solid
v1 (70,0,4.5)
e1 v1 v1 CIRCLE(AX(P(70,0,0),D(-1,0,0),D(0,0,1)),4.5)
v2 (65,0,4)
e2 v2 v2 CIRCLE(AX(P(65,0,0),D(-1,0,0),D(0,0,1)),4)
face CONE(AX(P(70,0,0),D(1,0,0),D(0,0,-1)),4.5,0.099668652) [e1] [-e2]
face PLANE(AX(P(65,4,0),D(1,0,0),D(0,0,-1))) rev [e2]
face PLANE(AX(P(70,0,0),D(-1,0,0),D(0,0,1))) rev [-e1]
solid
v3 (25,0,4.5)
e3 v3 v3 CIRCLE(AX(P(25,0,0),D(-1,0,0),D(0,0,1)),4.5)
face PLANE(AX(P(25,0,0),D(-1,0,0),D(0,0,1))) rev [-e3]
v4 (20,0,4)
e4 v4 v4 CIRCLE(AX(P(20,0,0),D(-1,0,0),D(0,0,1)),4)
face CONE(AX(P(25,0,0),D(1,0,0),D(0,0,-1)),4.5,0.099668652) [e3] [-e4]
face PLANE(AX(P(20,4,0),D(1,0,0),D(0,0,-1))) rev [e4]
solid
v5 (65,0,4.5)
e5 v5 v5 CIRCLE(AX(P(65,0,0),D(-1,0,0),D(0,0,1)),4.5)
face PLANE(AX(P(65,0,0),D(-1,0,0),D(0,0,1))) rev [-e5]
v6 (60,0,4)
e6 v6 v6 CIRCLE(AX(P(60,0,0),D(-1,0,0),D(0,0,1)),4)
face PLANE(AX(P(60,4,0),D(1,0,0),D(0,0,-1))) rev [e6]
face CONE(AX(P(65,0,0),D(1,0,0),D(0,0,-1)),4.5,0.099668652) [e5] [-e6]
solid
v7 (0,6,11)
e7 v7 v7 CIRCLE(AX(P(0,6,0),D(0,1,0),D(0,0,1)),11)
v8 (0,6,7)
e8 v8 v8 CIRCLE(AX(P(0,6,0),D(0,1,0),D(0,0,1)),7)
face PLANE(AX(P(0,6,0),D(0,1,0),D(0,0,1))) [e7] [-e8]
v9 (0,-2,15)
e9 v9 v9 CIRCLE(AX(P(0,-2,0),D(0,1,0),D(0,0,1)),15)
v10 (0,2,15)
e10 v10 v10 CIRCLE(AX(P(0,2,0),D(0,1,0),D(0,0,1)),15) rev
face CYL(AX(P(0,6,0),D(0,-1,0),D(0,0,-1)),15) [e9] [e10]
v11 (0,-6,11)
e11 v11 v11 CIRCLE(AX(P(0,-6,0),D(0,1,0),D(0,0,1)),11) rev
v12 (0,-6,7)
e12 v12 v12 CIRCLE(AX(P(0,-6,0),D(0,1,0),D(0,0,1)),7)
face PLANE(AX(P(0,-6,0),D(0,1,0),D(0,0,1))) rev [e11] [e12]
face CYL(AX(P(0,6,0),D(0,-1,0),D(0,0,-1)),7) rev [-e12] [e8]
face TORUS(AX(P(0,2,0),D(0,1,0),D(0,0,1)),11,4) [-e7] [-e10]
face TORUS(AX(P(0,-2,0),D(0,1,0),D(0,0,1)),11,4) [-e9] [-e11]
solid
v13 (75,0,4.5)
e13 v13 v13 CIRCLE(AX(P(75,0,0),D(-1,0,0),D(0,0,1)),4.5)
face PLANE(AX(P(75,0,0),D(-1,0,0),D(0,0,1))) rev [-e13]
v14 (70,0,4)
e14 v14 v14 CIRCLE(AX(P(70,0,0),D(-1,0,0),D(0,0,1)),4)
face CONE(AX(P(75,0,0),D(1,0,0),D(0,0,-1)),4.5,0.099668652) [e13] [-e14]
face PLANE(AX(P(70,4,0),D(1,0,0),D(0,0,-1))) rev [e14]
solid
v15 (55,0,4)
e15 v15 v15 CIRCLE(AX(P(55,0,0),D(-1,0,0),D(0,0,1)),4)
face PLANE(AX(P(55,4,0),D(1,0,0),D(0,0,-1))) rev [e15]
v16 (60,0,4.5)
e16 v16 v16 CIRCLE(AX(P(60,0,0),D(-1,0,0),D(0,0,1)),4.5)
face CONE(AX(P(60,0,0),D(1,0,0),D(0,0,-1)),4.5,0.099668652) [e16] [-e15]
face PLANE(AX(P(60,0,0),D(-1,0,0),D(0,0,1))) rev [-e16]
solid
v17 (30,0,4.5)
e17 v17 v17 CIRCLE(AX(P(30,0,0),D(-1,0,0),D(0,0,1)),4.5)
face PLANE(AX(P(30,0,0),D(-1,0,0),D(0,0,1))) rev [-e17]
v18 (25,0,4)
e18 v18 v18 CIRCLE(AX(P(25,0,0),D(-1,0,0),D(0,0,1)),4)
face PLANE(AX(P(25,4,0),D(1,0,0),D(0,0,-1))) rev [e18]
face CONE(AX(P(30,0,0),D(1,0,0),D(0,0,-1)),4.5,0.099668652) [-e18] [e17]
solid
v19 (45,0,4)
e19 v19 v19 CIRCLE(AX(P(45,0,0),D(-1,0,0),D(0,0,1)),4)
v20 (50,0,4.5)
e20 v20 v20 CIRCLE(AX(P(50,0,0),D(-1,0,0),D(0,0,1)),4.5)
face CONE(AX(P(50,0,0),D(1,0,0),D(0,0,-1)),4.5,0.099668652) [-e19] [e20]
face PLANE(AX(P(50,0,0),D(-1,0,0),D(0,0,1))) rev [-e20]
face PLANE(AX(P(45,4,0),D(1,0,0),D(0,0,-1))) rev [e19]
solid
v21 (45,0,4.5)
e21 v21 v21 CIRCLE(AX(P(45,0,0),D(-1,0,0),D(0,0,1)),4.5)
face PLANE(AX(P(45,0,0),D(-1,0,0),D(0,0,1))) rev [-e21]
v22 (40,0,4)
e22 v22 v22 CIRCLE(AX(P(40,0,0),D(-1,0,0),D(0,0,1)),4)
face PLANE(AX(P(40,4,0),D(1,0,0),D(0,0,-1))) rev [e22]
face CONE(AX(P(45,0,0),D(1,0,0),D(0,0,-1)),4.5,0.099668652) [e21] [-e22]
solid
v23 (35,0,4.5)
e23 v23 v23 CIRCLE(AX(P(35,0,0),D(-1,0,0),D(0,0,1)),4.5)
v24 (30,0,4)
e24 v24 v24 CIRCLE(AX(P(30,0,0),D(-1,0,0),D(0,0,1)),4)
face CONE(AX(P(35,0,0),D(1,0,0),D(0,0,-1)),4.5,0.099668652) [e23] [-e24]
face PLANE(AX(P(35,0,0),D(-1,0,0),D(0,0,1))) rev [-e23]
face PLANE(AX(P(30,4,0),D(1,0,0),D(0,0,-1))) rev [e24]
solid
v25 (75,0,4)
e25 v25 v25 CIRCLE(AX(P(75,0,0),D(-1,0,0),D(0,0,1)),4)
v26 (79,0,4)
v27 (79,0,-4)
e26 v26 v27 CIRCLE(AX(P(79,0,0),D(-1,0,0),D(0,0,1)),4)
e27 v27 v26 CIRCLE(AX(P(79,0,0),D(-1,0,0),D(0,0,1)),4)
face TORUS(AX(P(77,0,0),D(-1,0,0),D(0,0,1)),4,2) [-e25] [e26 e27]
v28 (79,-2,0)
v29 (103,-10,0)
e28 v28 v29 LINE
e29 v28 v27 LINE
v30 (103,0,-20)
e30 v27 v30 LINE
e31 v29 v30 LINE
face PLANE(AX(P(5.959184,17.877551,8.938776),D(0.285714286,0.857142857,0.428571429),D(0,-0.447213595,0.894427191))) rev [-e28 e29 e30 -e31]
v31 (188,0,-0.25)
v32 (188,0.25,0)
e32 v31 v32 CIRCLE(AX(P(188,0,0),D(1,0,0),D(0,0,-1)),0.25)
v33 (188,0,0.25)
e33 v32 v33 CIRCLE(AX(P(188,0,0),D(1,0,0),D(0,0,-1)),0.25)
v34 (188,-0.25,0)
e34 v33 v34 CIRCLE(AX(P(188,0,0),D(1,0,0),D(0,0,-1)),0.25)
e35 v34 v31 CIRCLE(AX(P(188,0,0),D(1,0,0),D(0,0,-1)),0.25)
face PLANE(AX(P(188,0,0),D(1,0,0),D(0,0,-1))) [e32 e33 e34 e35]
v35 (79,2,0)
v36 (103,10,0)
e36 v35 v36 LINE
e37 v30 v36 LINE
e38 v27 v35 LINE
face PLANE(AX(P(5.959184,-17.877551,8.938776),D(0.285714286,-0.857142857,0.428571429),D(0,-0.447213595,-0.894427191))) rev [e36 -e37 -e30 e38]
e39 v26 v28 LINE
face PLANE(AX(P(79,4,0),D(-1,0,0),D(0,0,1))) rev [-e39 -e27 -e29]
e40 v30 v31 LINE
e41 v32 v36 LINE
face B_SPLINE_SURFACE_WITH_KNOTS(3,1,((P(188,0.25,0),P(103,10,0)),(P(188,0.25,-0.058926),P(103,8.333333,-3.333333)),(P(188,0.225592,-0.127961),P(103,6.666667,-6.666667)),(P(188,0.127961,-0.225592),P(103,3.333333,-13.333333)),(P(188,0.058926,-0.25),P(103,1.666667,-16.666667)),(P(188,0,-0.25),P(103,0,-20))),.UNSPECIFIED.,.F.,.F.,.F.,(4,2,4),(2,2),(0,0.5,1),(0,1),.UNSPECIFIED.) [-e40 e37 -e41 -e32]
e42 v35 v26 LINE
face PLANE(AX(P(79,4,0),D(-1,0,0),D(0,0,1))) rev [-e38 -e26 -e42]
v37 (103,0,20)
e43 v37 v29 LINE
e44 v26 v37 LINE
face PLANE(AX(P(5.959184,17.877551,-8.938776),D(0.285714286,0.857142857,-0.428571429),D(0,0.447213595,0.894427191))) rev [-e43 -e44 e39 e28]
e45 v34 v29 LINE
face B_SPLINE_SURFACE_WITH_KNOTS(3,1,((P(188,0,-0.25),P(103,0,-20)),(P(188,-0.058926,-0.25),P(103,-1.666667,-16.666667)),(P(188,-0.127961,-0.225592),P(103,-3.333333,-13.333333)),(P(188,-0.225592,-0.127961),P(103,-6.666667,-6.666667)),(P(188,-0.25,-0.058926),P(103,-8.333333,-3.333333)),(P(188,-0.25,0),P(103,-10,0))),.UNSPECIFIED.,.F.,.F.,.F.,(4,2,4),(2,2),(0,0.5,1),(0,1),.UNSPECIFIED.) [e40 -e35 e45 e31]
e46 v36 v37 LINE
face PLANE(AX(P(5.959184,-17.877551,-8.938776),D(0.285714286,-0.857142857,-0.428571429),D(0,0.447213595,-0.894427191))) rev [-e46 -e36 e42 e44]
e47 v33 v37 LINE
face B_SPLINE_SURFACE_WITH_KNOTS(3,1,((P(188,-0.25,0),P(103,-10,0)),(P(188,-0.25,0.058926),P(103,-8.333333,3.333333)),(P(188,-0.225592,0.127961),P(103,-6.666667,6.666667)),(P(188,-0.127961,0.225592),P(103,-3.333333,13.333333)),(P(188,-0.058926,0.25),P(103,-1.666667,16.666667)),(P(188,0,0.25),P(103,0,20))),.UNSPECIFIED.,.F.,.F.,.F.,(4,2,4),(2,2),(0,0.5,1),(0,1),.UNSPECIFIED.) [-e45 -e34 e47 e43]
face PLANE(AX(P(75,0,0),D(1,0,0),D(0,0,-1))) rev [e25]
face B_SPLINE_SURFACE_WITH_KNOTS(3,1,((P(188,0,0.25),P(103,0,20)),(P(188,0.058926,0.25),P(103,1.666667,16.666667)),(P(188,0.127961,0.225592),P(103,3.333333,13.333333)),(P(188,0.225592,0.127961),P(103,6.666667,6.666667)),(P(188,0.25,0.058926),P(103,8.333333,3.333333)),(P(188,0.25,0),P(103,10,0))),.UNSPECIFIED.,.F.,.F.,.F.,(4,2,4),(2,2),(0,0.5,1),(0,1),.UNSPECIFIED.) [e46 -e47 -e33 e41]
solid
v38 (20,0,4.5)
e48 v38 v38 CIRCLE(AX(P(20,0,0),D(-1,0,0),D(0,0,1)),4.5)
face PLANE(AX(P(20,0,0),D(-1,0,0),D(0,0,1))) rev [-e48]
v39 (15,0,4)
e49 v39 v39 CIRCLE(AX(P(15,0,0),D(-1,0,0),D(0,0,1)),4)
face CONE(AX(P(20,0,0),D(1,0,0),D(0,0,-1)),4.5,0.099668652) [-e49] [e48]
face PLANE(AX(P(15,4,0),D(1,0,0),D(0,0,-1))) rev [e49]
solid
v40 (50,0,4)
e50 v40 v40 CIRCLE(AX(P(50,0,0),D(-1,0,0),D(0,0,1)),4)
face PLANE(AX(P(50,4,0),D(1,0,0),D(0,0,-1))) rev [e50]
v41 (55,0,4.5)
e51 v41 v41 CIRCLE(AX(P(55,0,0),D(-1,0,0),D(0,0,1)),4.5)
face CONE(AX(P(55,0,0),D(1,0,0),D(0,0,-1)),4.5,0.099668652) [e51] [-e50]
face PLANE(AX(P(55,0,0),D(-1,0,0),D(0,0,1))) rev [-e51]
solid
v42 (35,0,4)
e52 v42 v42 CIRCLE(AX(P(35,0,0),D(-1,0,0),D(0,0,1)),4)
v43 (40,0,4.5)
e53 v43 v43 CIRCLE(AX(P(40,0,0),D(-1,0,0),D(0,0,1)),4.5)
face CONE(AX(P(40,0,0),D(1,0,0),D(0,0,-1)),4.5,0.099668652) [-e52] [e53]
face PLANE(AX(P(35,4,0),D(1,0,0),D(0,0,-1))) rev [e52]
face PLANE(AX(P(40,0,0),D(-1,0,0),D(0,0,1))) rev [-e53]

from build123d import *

# Parameters (mm, degrees)
SKETCH1_R           = 15
SKETCH1_R_2         = 7
BOSS_EXTRUDE1_DEPTH = 6
FILLET1_R           = 4


with BuildPart() as part:
    # Sketch1 → Boss-Extrude1 (new, symmetric)
    with BuildSketch(Plane(origin=(0, 0, 0), x_dir=(1, 0, 0), z_dir=(0, 1, 0))):
        with Locations(Location((0, 0, 0), (0, 0, 270))):
            Circle(SKETCH1_R)
        with Locations(Location((0, 0, 0), (0, 0, 270))):
            Circle(SKETCH1_R_2, mode=Mode.SUBTRACT)
    extrude(amount=BOSS_EXTRUDE1_DEPTH, both=True)

    # Fillet1
    fillet1_edges = [part.edges().sort_by_distance(p)[0] for p in [
        (0, -6, -15),
        (0, 6, -15),
    ]]
    fillet(fillet1_edges, radius=FILLET1_R)


with BuildPart() as body_2:
    # Sketch2 → Revolve1 (revolve)
    with BuildSketch(Plane.XY, mode=Mode.PRIVATE) as revolve1_sk:
        Polygon((20, 0), (20, 4.5), (15, 4), (15, 0), align=None)
        with BuildLine():
            Line((75, 0), (75, 4))
            ThreePointArc((75, 4), (77, 6), (79, 4))
            Line((79, 4), (79, 0))
            Line((79, 0), (75, 0))
        make_face()
    revolve(revolve1_sk.sketch.rotate(Axis((15, 0, 0), (1, 0, 0)), 90), axis=Axis((15, 0, 0), (1, 0, 0)))

    # Sketch6 → Loft1 section 0
    with BuildSketch(Plane(origin=(79, 0, 0), x_dir=(0, 0, -1), z_dir=(1, 0, 0))):
        with BuildLine():
            Line((0, 2), (-4, 0))
            Line((-4, 0), (0, -2))
            Line((0, -2), (4, 0))
            Line((4, 0), (0, 2))
        make_face()
    # Sketch5 → Loft1 section 1
    with BuildSketch(Plane(origin=(103, 0, 0), x_dir=(0, 0, -1), z_dir=(1, 0, 0))):
        with BuildLine():
            Line((0, 10), (-20, 0))
            Line((-20, 0), (0, -10))
            Line((0, -10), (20, 0))
            Line((20, 0), (0, 10))
        make_face()
    loft()

    # Loft3: read off the stored shape, not the designer's step
    # Loft3: loft between two sections, ruled curve by curve
    loft3_from = [
        Edge.make_bspline([(188, 0, -0.25), (188, -0.058925565, -0.25), (188, -0.127961159, -0.225592232), (188, -0.225592232, -0.127961159), (188, -0.25, -0.058925565), (188, -0.25, 0)], [0, 0, 0, 0, 0.5, 0.5, 1, 1, 1, 1], 3),
        Edge.make_bspline([(188, -0.25, 0), (188, -0.25, 0.058925565), (188, -0.225592232, 0.127961159), (188, -0.127961159, 0.225592232), (188, -0.058925565, 0.25), (188, 0, 0.25)], [0, 0, 0, 0, 0.5, 0.5, 1, 1, 1, 1], 3),
        Edge.make_bspline([(188, 0.25, 0), (188, 0.25, -0.058925565), (188, 0.225592232, -0.127961159), (188, 0.127961159, -0.225592232), (188, 0.058925565, -0.25), (188, 0, -0.25)], [0, 0, 0, 0, 0.5, 0.5, 1, 1, 1, 1], 3),
        Edge.make_bspline([(188, 0, 0.25), (188, 0.058925565, 0.25), (188, 0.127961159, 0.225592232), (188, 0.225592232, 0.127961159), (188, 0.25, 0.058925565), (188, 0.25, 0)], [0, 0, 0, 0, 0.5, 0.5, 1, 1, 1, 1], 3),
    ]
    loft3_to = [
        Edge.make_bspline([(103, 0, -20), (103, -1.666666667, -16.666666667), (103, -3.333333333, -13.333333333), (103, -6.666666667, -6.666666667), (103, -8.333333333, -3.333333333), (103, -10, 0)], [0, 0, 0, 0, 0.5, 0.5, 1, 1, 1, 1], 3),
        Edge.make_bspline([(103, -10, 0), (103, -8.333333333, 3.333333333), (103, -6.666666667, 6.666666667), (103, -3.333333333, 13.333333333), (103, -1.666666667, 16.666666667), (103, 0, 20)], [0, 0, 0, 0, 0.5, 0.5, 1, 1, 1, 1], 3),
        Edge.make_bspline([(103, 10, 0), (103, 8.333333333, -3.333333333), (103, 6.666666667, -6.666666667), (103, 3.333333333, -13.333333333), (103, 1.666666667, -16.666666667), (103, 0, -20)], [0, 0, 0, 0, 0.5, 0.5, 1, 1, 1, 1], 3),
        Edge.make_bspline([(103, 0, 20), (103, 1.666666667, 16.666666667), (103, 3.333333333, 13.333333333), (103, 6.666666667, 6.666666667), (103, 8.333333333, 3.333333333), (103, 10, 0)], [0, 0, 0, 0, 0.5, 0.5, 1, 1, 1, 1], 3),
    ]
    loft3 = Solid(Shell([*[Face.make_surface_from_curves(loft3_from[k], loft3_to[k]) for k in range(4)], Face(Wire(loft3_from)), Face(Wire(loft3_to))]))
    add(loft3)


with BuildPart() as body_3:
    # LPattern1: read off the stored shape, not the designer's step
    # LPattern1 outline → LPattern1 (revolve)
    with BuildSketch(Plane.YX):
        Polygon((4.5, 75), (0, 75), (0, 70), (4, 70), align=None)
    revolve(axis=Axis((0, 0, 0), (1, 0, 0)))


with BuildPart() as body_4:
    # LPattern1 2 outline → LPattern1 2 (revolve)
    with BuildSketch(Plane.YX):
        Polygon((4.5, 70), (0, 70), (0, 65), (4, 65), align=None)
    revolve(axis=Axis((0, 0, 0), (1, 0, 0)))


with BuildPart() as body_5:
    # LPattern1 3 outline → LPattern1 3 (revolve)
    with BuildSketch(Plane.YX):
        Polygon((4.5, 65), (0, 65), (0, 60), (4, 60), align=None)
    revolve(axis=Axis((0, 0, 0), (1, 0, 0)))


with BuildPart() as body_6:
    # LPattern1 4 outline → LPattern1 4 (revolve)
    with BuildSketch(Plane.YX):
        Polygon((4.5, 60), (0, 60), (0, 55), (4, 55), align=None)
    revolve(axis=Axis((0, 0, 0), (1, 0, 0)))


with BuildPart() as body_7:
    # LPattern1 5 outline → LPattern1 5 (revolve)
    with BuildSketch(Plane.YX):
        Polygon((4.5, 55), (0, 55), (0, 50), (4, 50), align=None)
    revolve(axis=Axis((0, 0, 0), (1, 0, 0)))


with BuildPart() as body_8:
    # LPattern1 6 outline → LPattern1 6 (revolve)
    with BuildSketch(Plane.YX):
        Polygon((4.5, 50), (0, 50), (0, 45), (4, 45), align=None)
    revolve(axis=Axis((0, 0, 0), (1, 0, 0)))


with BuildPart() as body_9:
    # LPattern1 7 outline → LPattern1 7 (revolve)
    with BuildSketch(Plane.YX):
        Polygon((4.5, 45), (0, 45), (0, 40), (4, 40), align=None)
    revolve(axis=Axis((0, 0, 0), (1, 0, 0)))


with BuildPart() as body_10:
    # LPattern1 8 outline → LPattern1 8 (revolve)
    with BuildSketch(Plane.YX):
        Polygon((4.5, 40), (0, 40), (0, 35), (4, 35), align=None)
    revolve(axis=Axis((0, 0, 0), (1, 0, 0)))


with BuildPart() as body_11:
    # LPattern1 9 outline → LPattern1 9 (revolve)
    with BuildSketch(Plane.YX):
        Polygon((4.5, 35), (0, 35), (0, 30), (4, 30), align=None)
    revolve(axis=Axis((0, 0, 0), (1, 0, 0)))


with BuildPart() as body_12:
    # LPattern1 10 outline → LPattern1 10 (revolve)
    with BuildSketch(Plane.YX):
        Polygon((4.5, 30), (0, 30), (0, 25), (4, 25), align=None)
    revolve(axis=Axis((0, 0, 0), (1, 0, 0)))


with BuildPart() as body_13:
    # LPattern1 11 outline → LPattern1 11 (revolve)
    with BuildSketch(Plane.YX):
        Polygon((4.5, 25), (0, 25), (0, 20), (4, 20), align=None)
    revolve(axis=Axis((0, 0, 0), (1, 0, 0)))


solid = Compound([part.part, body_2.part, body_3.part, body_4.part, body_5.part, body_6.part, body_7.part, body_8.part, body_9.part, body_10.part, body_11.part, body_12.part, body_13.part])
